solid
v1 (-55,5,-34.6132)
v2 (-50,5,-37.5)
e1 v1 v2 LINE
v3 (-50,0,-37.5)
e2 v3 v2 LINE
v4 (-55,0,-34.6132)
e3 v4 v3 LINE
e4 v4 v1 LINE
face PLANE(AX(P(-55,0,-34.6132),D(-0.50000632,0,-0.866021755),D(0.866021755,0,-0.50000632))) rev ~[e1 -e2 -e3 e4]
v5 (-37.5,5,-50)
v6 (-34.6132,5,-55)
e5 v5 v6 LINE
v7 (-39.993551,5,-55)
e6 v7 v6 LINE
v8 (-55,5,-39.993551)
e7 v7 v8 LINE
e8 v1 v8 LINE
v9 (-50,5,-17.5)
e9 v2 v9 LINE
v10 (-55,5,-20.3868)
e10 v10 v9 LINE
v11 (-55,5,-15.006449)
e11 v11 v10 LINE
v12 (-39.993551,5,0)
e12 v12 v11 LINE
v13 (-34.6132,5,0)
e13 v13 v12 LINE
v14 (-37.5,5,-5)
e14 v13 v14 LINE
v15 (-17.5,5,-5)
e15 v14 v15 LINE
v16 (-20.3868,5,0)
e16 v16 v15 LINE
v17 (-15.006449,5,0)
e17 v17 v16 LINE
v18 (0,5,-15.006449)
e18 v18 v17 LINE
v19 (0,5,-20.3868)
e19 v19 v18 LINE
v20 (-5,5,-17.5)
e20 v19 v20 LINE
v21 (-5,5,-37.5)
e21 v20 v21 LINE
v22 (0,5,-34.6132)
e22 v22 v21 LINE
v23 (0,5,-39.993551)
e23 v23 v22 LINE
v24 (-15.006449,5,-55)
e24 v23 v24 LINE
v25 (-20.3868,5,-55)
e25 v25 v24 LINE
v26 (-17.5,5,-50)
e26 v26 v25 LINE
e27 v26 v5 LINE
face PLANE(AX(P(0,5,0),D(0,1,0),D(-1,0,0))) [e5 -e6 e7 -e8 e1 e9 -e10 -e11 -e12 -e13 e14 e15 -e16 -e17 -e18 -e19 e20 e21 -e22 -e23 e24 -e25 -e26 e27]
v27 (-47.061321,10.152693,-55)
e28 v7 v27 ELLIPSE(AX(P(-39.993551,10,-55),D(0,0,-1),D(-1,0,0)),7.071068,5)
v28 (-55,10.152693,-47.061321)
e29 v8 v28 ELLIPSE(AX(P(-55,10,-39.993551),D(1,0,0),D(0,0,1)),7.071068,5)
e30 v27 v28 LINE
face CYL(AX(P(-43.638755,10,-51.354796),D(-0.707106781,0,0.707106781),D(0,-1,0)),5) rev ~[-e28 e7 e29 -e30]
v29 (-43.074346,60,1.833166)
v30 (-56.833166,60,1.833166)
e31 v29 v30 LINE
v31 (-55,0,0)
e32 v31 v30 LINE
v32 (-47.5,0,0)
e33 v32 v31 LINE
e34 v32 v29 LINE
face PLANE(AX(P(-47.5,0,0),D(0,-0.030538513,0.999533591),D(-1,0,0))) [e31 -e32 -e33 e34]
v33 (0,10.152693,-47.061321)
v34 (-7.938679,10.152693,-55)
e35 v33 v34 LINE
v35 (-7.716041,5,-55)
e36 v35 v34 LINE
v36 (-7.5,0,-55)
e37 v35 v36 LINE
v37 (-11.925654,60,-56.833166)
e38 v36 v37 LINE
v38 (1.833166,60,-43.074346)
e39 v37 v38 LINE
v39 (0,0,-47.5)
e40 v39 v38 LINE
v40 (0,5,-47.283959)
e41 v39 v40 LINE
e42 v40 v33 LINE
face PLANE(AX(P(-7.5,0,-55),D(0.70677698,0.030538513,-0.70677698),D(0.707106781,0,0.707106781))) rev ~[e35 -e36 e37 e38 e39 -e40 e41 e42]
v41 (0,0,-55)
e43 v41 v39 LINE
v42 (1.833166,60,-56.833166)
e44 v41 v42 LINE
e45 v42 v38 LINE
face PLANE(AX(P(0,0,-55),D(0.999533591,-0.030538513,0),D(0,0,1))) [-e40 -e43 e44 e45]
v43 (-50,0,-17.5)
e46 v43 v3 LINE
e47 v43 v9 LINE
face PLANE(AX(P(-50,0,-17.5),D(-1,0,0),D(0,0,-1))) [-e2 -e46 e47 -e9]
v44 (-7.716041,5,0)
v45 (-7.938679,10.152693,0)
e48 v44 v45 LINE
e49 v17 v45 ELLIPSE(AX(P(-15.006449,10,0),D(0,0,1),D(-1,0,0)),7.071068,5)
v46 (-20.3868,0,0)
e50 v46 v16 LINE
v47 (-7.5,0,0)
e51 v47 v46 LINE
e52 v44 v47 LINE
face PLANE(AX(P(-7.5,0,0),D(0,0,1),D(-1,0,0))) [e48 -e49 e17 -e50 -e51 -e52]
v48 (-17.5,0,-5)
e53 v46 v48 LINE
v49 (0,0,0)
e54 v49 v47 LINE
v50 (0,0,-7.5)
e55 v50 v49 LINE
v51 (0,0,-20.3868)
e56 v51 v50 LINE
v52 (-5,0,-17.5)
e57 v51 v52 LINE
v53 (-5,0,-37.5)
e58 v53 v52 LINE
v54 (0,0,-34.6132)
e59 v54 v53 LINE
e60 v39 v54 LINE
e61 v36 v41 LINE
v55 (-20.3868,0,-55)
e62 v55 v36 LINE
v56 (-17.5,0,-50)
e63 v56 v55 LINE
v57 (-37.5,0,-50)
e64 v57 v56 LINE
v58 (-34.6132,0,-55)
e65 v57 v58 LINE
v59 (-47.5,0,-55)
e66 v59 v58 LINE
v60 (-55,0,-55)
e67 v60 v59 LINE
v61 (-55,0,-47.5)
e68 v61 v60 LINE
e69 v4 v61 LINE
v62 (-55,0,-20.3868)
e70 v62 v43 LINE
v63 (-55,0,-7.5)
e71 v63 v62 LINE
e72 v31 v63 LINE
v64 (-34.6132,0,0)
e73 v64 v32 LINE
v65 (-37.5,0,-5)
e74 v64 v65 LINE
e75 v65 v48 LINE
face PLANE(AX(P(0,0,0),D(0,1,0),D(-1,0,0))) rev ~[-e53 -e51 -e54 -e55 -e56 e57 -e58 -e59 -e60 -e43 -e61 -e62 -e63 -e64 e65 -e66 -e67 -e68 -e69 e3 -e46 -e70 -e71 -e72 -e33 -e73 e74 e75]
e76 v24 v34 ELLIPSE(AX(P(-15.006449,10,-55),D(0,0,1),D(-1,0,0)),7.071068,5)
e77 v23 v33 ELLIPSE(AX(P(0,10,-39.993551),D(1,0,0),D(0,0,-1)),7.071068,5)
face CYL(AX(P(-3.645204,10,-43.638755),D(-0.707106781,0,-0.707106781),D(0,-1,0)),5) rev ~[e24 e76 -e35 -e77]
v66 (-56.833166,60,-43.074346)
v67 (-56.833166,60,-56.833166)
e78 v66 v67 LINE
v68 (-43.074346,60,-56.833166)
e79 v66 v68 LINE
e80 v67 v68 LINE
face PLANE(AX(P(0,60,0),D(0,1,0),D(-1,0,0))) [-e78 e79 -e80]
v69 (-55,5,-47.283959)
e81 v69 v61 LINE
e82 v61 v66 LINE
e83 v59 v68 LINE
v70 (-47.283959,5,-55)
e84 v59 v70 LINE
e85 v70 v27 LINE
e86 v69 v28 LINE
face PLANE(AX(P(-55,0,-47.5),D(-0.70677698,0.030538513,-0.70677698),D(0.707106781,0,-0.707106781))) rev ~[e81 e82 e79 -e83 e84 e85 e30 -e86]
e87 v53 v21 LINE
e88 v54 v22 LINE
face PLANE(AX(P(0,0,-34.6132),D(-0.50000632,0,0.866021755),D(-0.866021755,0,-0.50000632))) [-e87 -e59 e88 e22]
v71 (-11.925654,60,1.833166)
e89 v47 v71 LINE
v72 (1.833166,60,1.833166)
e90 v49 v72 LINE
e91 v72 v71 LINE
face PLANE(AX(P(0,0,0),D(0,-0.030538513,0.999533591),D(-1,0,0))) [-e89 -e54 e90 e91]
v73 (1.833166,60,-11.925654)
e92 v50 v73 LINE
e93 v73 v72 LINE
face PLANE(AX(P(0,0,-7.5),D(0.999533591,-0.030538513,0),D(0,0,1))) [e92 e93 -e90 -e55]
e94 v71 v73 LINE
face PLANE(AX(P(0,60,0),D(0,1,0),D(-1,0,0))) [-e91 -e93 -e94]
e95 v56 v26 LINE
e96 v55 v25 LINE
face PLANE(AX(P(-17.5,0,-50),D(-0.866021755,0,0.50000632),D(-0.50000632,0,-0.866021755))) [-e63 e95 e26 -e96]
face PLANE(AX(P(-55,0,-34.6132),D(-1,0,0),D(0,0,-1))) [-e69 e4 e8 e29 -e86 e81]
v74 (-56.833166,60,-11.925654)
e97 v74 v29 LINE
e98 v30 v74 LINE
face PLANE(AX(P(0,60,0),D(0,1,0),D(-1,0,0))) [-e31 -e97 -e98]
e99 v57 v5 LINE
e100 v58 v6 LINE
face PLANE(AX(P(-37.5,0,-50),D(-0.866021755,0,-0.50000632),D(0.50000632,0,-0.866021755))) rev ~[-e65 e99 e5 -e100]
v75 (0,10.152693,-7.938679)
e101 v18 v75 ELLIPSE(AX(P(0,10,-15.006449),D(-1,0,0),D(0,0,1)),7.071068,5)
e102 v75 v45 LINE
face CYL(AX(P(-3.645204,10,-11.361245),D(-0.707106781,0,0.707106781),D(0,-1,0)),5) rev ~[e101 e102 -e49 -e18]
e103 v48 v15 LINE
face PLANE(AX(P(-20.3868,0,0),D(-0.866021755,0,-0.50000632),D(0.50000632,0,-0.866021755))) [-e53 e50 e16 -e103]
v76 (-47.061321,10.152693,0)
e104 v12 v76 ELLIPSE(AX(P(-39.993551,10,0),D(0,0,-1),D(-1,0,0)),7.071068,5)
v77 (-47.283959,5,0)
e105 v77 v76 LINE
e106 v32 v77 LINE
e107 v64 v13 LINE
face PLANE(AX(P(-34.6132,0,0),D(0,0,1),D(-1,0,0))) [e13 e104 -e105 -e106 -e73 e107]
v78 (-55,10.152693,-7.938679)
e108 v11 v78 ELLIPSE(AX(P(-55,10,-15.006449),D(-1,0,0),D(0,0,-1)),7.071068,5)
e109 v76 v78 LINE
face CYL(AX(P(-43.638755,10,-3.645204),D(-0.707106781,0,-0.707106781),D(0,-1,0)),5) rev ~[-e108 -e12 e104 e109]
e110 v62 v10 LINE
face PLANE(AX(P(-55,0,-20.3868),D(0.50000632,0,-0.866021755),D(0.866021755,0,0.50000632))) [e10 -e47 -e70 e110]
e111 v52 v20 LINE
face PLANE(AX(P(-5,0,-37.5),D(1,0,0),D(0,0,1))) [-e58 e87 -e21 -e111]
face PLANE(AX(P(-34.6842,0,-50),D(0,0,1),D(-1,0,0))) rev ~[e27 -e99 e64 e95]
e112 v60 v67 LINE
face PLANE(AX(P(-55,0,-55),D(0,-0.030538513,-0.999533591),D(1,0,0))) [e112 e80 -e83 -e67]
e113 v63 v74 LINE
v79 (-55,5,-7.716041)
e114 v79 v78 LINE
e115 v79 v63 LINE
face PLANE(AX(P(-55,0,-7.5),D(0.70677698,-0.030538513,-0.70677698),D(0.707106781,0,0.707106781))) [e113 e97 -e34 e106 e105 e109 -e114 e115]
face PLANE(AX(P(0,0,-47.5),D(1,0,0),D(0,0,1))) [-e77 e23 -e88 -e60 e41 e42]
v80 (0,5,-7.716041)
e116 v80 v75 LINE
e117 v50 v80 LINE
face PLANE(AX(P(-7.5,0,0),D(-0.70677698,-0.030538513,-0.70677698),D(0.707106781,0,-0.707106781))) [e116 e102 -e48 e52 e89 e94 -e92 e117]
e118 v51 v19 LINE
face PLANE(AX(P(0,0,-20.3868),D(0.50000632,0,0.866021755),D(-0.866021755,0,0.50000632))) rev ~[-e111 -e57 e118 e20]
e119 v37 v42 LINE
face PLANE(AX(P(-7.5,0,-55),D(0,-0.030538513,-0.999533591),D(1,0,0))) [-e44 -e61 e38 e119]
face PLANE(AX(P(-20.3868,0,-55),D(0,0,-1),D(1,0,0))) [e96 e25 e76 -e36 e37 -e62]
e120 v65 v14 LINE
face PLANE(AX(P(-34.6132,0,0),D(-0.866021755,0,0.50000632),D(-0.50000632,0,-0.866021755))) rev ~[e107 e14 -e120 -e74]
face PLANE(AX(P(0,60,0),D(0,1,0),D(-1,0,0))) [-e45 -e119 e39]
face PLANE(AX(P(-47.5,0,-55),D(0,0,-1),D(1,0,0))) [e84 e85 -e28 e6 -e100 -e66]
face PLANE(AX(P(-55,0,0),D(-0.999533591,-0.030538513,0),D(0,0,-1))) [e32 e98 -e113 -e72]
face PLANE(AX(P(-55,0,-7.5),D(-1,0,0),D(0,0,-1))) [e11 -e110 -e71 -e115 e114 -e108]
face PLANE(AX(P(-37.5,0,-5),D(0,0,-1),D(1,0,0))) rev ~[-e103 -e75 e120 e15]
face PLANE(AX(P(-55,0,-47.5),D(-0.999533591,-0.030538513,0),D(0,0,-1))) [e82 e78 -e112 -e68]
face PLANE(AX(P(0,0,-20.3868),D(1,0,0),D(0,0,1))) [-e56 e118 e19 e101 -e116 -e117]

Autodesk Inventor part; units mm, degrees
ref_plane "YZ Plane" through (0, 0, 0) normal (1, 0, 0) x (0, 1, 0)
ref_plane "XZ Plane" through (0, 0, 0) normal (0, 1, 0) x (-1, 0, 0)
ref_plane "XY Plane" through (0, 0, 0) normal (0, 0, 1) x (1, 0, 0)
sketch "Sketch1" plane through (0, 0, 0) normal (0, 1, 0) x (-1, 0, 0)
  line L0 (0, 0) -> (55, 0)
  line L1 (55, 0) -> (55, -55)
  line L2 (55, -55) -> (0, -55)
  line L3 (0, -55) -> (0, 0)
  line L4 (55, -27.5) -> (0, -27.5) construction
  line L5 (27.5, -55) -> (27.5, 0) construction
  line L6 (20.3868, -55) -> (34.6132, -55)
  line L7 (34.6842, -50) -> (21.2609, -50)
  line L8 (50, -17.5) -> (50, -33.6438)
  line L9 (55, -34.6132) -> (55, -20.3868)
  line L10 (5, -18.3051) -> (5, -36.8563)
  line L11 (0, -34.6132) -> (0, -20.3868)
  line L12 (20.3868, 0) -> (34.6132, 0)
  line L13 (37.7365, -5) -> (17.5, -5)
  line L14 (55, -34.6132) -> (50, -37.5)
  line L15 (50, -37.5) -> (50, -33.6438)
  line L16 (55, -20.3868) -> (50, -17.5)
  line L17 (34.6842, -50) -> (37.5, -50)
  line L18 (37.5, -50) -> (34.6132, -55)
  line L19 (21.2609, -50) -> (17.5, -50)
  line L20 (17.5, -50) -> (20.3868, -55)
  line L21 (0, -34.6132) -> (5, -37.5)
  line L22 (5, -37.5) -> (5, -36.8563)
  line L23 (0, -20.3868) -> (5, -17.5)
  line L24 (5, -17.5) -> (5, -18.3051)
  line L25 (20.3868, 0) -> (17.5, -5)
  line L26 (34.6132, 0) -> (37.5, -5)
  line L27 (37.5, -5) -> (37.7365, -5)
  line L28 (55, -47.5) -> (47.5, -55)
  line L29 (55, -7.5) -> (47.5, 0)
  line L30 (7.5, -55) -> (0, -47.5)
  line L31 (7.5, 0) -> (0, -7.5)
  line L32 (55, 0) -> (0, 0)
  line L33 (0, 0) -> (0, -55)
  line L34 (0, -55) -> (55, -55)
  line L35 (55, -55) -> (55, 0)
  dimension "d0" = 55
  dimension "d1" = 55
  dimension "d4" = 5
  dimension "d5" = 5
  dimension "d6" = 60
  dimension "d9" = 60
  dimension "d10" = 60
  dimension "d13" = 20
  dimension "d14" = 10
  dimension "d15" = 60
  dimension "d16" = 5
  dimension "d18" = 60
  dimension "d19" = 5
  dimension "d20" = 20
  dimension "d21" = 10
  dimension "d22" = 10
  dimension "d23" = 20
  dimension "d24" = 20
  dimension "d25" = 10
  dimension "d26" = 7.5
  dimension "d27" = 7.5
  dimension "d28" = 7.5
  dimension "d29" = 7.5
  dimension "d30" = 7.5
  dimension "d31" = 7.5
extrude "Extrusion1" add sketch "Sketch1" along normal blind 5 contours L0 L25 L13 L26 L29 L1 L16 L8 L15 L14 L28 L2 L18 L17 L7 L19 L20 L30 L3 L21 L22 L10 L24 L23 L31
extrude "Extrusion2" add sketch "Sketch1" along normal blind 60 draft 1.75 contours L0 L31 L3 | L0 L1 L29 | L30 L2 L3 | L1 L2 L28
fillet "Fillet1" radius 5 4 edges at (-3.858, 5, -51.142) (-3.858, 5, -3.858) (-51.142, 5, -51.142) (-51.142, 5, -3.858)
equation "\"d0\" = side_length"
equation "\"d1\" = side_length"
equation "\"d4\" = dovetail_depth"
equation "\"d5\" = dovetail_depth"
equation "\"d13\" = dovetail_max_length"
equation "\"d14\" = 0.5 * dovetail_max_length"
equation "\"d16\" = dovetail_depth"
equation "\"d19\" = dovetail_depth"
equation "\"d20\" = dovetail_max_length"
equation "\"d21\" = 0.5 * dovetail_max_length"
equation "\"d22\" = 0.5 * dovetail_max_length"
equation "\"d23\" = dovetail_max_length"
equation "\"d24\" = dovetail_max_length"
equation "\"d25\" = 0.5 * dovetail_max_length"
equation "\"d26\" = claw_wall_side_length"
equation "\"d27\" = claw_wall_side_length"
equation "\"d28\" = claw_wall_side_length"
equation "\"d29\" = claw_wall_side_length"
equation "\"d30\" = claw_wall_side_length"
equation "\"d31\" = claw_wall_side_length"
equation "\"side_length\" = 55"
equation "\"dovetail_depth\" = 5"
equation "\"dovetail_max_length\" = 20"
equation "\"claw_wall_side_length\" = 7.5"
equation "\"band_notch_height\" = 45"
properties part number "Duck_Holder"
